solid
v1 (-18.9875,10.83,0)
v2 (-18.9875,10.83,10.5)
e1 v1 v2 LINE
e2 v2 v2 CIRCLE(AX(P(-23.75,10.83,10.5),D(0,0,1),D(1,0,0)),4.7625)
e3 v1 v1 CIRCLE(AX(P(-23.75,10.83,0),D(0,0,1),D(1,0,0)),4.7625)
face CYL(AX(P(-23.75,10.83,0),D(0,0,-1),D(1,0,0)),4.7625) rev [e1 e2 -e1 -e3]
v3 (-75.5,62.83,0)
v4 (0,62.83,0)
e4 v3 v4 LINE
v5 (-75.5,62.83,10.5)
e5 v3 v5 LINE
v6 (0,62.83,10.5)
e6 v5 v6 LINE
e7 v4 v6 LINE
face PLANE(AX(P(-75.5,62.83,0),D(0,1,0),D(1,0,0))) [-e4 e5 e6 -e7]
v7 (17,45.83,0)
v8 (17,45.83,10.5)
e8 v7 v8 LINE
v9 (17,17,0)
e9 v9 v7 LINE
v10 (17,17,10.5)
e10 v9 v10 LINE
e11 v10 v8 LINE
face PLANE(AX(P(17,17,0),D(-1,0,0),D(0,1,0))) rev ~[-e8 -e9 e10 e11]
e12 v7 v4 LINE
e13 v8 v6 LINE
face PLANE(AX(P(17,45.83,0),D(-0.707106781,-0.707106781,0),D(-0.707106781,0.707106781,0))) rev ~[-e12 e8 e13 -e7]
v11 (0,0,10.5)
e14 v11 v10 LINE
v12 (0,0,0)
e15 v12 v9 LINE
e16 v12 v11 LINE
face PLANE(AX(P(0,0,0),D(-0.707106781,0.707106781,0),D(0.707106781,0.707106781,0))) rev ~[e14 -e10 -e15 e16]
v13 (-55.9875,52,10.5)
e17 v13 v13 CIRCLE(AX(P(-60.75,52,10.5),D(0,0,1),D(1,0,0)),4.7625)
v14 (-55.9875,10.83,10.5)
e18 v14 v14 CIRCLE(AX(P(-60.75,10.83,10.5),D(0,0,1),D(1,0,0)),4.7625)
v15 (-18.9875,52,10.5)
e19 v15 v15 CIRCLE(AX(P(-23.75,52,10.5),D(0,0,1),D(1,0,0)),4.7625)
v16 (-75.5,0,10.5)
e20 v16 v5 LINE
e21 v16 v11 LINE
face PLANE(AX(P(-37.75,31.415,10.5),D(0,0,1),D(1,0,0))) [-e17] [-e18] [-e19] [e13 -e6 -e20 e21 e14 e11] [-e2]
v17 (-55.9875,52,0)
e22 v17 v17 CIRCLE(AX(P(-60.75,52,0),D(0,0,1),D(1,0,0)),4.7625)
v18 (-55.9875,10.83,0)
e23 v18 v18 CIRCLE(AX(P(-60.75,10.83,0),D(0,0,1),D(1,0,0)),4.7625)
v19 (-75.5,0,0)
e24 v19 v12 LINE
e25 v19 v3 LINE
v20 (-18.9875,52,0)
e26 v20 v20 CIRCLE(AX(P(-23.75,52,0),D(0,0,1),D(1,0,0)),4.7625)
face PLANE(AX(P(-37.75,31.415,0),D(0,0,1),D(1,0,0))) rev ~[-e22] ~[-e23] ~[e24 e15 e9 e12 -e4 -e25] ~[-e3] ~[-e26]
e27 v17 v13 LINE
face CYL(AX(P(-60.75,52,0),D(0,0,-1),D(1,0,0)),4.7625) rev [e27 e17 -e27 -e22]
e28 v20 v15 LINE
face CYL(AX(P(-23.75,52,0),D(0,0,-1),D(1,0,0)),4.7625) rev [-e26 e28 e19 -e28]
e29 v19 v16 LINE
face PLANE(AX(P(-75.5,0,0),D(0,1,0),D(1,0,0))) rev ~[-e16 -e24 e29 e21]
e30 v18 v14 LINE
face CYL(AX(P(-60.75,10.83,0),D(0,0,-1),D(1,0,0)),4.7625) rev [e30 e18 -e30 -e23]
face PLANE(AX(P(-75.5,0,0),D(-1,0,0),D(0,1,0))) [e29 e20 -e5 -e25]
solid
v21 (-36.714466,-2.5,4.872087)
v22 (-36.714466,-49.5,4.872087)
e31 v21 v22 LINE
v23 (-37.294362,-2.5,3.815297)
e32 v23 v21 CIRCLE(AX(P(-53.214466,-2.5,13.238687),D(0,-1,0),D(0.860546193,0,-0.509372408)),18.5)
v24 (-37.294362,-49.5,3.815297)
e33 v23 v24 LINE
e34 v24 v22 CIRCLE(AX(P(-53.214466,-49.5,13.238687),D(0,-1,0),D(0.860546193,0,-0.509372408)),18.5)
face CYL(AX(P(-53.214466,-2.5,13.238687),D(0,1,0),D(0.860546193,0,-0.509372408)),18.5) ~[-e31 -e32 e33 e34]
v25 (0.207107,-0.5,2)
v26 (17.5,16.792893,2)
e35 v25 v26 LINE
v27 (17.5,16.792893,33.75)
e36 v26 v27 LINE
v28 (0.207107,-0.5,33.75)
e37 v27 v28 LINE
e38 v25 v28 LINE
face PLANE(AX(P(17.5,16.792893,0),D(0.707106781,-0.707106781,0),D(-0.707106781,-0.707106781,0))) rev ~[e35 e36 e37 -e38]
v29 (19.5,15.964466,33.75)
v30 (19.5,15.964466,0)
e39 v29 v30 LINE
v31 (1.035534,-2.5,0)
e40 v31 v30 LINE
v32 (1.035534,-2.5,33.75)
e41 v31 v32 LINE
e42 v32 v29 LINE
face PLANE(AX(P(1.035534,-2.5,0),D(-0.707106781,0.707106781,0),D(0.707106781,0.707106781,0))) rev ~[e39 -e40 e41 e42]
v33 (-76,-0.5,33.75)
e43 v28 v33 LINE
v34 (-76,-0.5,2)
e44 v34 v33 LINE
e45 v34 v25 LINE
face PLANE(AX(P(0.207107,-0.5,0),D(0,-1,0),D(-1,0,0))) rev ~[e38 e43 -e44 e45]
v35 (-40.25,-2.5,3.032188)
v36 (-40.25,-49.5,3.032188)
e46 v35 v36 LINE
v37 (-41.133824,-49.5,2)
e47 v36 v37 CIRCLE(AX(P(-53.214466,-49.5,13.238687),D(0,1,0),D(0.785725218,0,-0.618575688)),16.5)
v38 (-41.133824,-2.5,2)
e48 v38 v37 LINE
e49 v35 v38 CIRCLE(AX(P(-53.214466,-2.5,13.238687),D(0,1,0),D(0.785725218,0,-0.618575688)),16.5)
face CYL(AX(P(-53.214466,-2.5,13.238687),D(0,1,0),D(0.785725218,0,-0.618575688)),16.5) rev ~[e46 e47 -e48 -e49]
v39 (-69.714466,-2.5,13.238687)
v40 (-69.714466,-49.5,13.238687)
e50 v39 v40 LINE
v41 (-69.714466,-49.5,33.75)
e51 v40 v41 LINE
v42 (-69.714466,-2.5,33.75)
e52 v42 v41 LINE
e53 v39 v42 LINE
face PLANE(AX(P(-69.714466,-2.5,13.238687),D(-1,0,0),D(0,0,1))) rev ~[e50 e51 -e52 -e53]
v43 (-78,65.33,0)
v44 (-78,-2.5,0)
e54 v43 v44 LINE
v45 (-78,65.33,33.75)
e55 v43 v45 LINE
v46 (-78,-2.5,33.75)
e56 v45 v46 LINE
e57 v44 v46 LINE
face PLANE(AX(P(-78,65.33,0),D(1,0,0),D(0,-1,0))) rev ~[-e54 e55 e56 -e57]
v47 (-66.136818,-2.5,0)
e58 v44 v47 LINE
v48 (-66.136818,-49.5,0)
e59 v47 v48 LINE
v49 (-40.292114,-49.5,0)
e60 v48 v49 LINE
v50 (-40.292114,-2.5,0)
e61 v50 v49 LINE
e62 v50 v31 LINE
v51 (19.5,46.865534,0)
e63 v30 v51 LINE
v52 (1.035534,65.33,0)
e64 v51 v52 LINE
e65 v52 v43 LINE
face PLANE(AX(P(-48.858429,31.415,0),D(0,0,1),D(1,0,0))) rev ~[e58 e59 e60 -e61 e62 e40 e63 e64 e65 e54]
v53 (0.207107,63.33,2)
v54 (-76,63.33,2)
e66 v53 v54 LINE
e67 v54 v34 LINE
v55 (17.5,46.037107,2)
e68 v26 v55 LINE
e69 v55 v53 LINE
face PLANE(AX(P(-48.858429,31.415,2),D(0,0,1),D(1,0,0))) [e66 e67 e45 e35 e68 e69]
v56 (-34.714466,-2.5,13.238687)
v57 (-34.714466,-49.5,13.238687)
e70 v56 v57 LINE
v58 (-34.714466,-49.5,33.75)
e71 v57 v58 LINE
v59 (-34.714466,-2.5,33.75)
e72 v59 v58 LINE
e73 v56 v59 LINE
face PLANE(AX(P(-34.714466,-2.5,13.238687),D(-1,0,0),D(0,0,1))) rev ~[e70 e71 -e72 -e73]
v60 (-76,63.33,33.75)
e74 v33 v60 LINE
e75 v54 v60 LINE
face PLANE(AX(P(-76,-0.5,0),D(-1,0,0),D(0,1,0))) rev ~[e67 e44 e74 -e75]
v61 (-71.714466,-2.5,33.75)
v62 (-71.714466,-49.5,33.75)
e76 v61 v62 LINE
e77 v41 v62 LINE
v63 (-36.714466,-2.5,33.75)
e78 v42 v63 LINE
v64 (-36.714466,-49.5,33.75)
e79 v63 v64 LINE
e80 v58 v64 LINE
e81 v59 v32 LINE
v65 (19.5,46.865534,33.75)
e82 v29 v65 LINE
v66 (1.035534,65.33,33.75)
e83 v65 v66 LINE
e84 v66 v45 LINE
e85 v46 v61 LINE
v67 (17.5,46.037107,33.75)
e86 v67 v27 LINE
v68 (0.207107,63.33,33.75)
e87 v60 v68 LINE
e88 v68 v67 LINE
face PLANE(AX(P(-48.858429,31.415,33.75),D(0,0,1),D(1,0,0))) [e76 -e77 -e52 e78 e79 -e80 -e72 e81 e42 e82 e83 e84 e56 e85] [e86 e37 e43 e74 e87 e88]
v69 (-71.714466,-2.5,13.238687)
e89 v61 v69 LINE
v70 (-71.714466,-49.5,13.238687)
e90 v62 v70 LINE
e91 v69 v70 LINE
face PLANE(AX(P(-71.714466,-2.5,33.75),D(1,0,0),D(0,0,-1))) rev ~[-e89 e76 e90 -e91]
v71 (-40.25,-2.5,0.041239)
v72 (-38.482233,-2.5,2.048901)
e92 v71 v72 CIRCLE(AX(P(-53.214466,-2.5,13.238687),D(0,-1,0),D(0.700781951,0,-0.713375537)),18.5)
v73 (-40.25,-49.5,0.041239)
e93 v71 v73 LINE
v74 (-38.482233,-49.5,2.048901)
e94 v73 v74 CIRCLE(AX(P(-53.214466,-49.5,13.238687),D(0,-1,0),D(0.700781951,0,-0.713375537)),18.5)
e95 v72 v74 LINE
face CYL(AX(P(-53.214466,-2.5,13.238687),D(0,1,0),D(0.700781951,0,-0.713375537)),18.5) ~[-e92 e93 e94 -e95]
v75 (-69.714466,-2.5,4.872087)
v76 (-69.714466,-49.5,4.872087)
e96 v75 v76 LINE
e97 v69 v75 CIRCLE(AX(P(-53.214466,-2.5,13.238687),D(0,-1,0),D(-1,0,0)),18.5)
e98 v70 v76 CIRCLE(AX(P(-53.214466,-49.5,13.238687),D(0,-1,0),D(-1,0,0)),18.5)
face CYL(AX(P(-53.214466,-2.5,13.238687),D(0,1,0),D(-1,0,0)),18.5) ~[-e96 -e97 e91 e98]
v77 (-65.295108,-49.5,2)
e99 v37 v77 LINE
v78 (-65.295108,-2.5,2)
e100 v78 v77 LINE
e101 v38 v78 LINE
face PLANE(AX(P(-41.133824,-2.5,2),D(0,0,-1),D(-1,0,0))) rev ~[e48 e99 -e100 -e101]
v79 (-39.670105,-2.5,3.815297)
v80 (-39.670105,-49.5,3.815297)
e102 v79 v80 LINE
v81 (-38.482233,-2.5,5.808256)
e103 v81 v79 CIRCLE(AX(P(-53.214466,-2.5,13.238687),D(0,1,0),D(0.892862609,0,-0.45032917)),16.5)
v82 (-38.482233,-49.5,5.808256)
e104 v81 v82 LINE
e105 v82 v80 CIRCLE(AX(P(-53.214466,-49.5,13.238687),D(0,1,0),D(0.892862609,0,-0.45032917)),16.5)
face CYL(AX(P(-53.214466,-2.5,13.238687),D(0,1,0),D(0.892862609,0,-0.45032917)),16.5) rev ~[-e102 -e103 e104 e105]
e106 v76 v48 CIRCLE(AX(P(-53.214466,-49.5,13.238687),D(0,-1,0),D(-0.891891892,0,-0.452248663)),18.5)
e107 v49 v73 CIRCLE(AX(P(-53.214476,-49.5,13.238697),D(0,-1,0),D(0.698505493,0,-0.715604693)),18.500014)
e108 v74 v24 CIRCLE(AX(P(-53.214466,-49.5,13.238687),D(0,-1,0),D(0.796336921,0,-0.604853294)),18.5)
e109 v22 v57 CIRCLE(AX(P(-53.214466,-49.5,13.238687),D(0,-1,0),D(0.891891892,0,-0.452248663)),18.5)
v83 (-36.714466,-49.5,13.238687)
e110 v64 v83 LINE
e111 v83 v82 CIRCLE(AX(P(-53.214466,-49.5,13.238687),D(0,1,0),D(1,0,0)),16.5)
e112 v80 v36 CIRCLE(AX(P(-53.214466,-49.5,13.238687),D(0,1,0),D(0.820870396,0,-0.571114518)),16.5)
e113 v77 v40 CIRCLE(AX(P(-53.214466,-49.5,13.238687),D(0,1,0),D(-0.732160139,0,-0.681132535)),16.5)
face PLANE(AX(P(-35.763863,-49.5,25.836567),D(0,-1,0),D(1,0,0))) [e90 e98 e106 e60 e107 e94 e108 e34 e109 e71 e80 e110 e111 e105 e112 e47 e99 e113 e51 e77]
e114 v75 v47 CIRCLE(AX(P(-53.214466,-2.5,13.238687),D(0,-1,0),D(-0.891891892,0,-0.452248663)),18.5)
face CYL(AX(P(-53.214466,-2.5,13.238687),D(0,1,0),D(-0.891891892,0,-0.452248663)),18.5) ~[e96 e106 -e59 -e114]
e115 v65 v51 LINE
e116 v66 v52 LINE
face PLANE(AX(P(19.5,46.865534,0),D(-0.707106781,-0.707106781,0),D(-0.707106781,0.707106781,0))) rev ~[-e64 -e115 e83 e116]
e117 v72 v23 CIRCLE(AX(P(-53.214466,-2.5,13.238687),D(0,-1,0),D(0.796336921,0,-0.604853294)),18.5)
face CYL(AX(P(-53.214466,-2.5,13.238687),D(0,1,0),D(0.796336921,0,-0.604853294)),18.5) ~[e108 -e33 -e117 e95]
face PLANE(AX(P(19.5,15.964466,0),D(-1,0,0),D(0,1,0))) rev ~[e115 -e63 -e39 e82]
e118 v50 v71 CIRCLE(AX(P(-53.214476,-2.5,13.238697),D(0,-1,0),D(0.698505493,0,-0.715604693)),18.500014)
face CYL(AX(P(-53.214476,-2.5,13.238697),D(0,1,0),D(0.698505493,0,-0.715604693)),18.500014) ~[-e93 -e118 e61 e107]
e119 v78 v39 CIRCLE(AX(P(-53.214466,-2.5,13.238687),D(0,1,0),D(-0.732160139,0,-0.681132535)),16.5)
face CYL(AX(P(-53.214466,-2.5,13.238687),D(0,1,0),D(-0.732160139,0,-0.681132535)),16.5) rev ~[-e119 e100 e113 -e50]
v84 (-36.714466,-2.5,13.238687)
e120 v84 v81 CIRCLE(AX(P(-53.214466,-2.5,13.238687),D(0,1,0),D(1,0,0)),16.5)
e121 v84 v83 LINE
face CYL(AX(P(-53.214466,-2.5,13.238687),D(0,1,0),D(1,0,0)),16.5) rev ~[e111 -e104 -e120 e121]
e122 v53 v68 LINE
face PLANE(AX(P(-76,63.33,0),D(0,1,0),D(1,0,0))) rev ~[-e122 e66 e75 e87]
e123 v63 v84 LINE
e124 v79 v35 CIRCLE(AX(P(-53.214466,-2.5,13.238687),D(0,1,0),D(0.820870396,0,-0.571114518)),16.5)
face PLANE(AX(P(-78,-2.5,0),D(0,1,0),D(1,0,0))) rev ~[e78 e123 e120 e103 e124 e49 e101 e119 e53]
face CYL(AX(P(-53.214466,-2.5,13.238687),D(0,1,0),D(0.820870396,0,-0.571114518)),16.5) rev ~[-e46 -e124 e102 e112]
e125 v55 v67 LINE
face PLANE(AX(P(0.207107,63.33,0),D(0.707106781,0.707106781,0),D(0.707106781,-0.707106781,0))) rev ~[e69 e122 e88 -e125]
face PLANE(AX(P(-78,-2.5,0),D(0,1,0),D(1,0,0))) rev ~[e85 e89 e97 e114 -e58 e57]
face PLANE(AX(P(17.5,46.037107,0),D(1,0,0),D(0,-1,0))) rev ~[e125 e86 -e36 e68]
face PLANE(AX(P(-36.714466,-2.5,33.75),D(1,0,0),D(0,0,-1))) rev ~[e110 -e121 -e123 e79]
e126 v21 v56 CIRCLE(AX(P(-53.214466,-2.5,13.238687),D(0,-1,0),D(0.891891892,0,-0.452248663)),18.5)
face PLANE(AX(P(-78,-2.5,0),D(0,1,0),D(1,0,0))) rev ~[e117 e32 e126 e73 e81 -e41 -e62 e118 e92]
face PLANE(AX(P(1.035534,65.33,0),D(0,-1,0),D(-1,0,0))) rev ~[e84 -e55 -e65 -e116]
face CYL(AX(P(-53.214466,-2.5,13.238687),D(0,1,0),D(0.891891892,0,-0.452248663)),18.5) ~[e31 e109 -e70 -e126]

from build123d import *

# Parameters (mm, degrees)
F0_W     = 75.5
F0_H     = 62.83
F0_R     = 4.7625
F1_DEPTH = 10.5
F2_W     = 76.2071067812
F2_H     = 63.83
F3_DEPTH = 2
F4_DEPTH = 33.75
F9_DEPTH = 47


# Not quite as in the source:
# - a feature of the source that left no trace in its solid (it failed there, or was rolled back) is left out


with BuildPart() as f1:
    # F0 (on Top) → F1 (new body)
    with BuildSketch(Plane.XY):
        with Locations((-37.75, 31.415)):
            Rectangle(F0_W, F0_H)
        with Locations((-60.75, 10.83)):
            Circle(F0_R, mode=Mode.SUBTRACT)
        with Locations((-23.75, 10.83)):
            Circle(F0_R, mode=Mode.SUBTRACT)
        with Locations((-60.75, 52)):
            Circle(F0_R, mode=Mode.SUBTRACT)
        with Locations((-23.75, 52)):
            Circle(F0_R, mode=Mode.SUBTRACT)
        Polygon((0, 62.83), (0, 0), (17, 17), (17, 45.83), align=None)
    extrude(amount=F1_DEPTH)


with BuildPart() as f3:
    # F2 (on Top) → F3 (new body)
    with BuildSketch(Plane.XY):
        Polygon((1.0355339059, 0.3284271247), (0.2071067812, -0.5), (-76, -0.5), (-76, 63.33), (0.2071067812, 63.33), (1.0355339059, 62.5015728753), (1.0355339059, 65.33), (-78, 65.33), (-78, -2.5), (1.0355339059, -2.5), align=None)
        Polygon((17.5, 16.7928932188), (1.0355339059, 0.3284271247), (1.0355339059, -2.5), (19.5, 15.9644660941), (19.5, 46.8655339059), (1.0355339059, 65.33), (1.0355339059, 62.5015728753), (17.5, 46.0371067812), align=None)
        Polygon((1.0355339059, 62.5015728753), (1.0355339059, 0.3284271247), (17.5, 16.7928932188), (17.5, 46.0371067812), align=None)
        with Locations((-37.8964466094, 31.415)):
            Rectangle(F2_W, F2_H)
        Polygon((0.2071067812, 63.33), (0.2071067812, -0.5), (1.0355339059, 0.3284271247), (1.0355339059, 62.5015728753), align=None)
    extrude(amount=F3_DEPTH)

    # F2 (on Top) → F4 (join)
    with BuildSketch(Plane.XY):
        Polygon((1.0355339059, 0.3284271247), (0.2071067812, -0.5), (-76, -0.5), (-76, 63.33), (0.2071067812, 63.33), (1.0355339059, 62.5015728753), (1.0355339059, 65.33), (-78, 65.33), (-78, -2.5), (1.0355339059, -2.5), align=None)
        Polygon((17.5, 16.7928932188), (1.0355339059, 0.3284271247), (1.0355339059, -2.5), (19.5, 15.9644660941), (19.5, 46.8655339059), (1.0355339059, 65.33), (1.0355339059, 62.5015728753), (17.5, 46.0371067812), align=None)
    extrude(amount=F4_DEPTH)

    # F5: union 

    # F6 (on face) → F9 (join)
    with BuildSketch(Plane.XZ.offset(2.5)):
        with BuildLine():
            Line((-34.7144660941, 25.5687510354), (-34.7144660941, 28.1393741738))
            ThreePointArc((-34.7144660941, 28.1393741738), (-35.7447365731, 27.3232988085), (-36.7144660941, 26.4361342702))
            Line((-36.7144660941, 26.4361342702), (-36.7144660941, 23.4451856875))
            ThreePointArc((-36.7144660941, 23.4451856875), (-35.761487475, 24.5512536772), (-34.7144660941, 25.5687510354))
        make_face()
        with BuildLine():
            ThreePointArc((-36.7144660941, 26.4361342702), (-35.7447365731, 27.3232988085), (-34.7144660941, 28.1393741738))
            Line((-34.7144660941, 28.1393741738), (-34.7144660941, 33.75))
            Line((-34.7144660941, 33.75), (-36.7144660941, 33.75))
            Line((-36.7144660941, 33.75), (-36.7144660941, 26.4361342702))
        make_face()
        with BuildLine():
            Line((-34.7144660941, 13.2386868315), (-34.7144660941, 25.5687510354))
            ThreePointArc((-34.7144660941, 25.5687510354), (-35.761487475, 24.5512536772), (-36.7144660941, 23.4451856875))
            Line((-36.7144660941, 23.4451856875), (-36.7144660941, 21.6052870969))
            ThreePointArc((-36.7144660941, 21.6052870969), (-35.2214118786, 17.5398494651), (-34.7144660941, 13.2386868315))
        make_face()
        with BuildLine():
            ThreePointArc((-36.7144660941, 4.8720865662), (-35.2214118786, 8.937524198), (-34.7144660941, 13.2386868315))
            Line((-34.7144660941, 13.2386868315), (-36.7144660941, 13.2386868315))
            Line((-36.7144660941, 13.2386868315), (-36.7144660941, 4.8720865662))
        make_face()
        with BuildLine():
            Line((-36.7144660941, 13.2386868315), (-34.7144660941, 13.2386868315))
            ThreePointArc((-34.7144660941, 13.2386868315), (-35.2214118786, 17.5398494651), (-36.7144660941, 21.6052870969))
            Line((-36.7144660941, 21.6052870969), (-36.7144660941, 13.2386868315))
        make_face()
        with BuildLine():
            Line((-36.7144660941, 4.8720865662), (-36.7144660941, 13.2386868315))
            ThreePointArc((-36.7144660941, 13.2386868315), (-37.1624904325, 9.4197763374), (-38.482233047, 5.8082555219))
            ThreePointArc((-38.482233047, 5.8082555219), (-37.9233701313, 4.7908717814), (-37.2943615313, 3.8152972763))
            ThreePointArc((-37.2943615313, 3.8152972763), (-36.9958041312, 4.3389675026), (-36.7144660941, 4.8720865662))
        make_face()
        with BuildLine():
            ThreePointArc((-37.2943615313, 3.8152972763), (-37.9233701313, 4.7908717814), (-38.482233047, 5.8082555219))
            ThreePointArc((-38.482233047, 5.8082555219), (-39.0410959628, 4.7908717814), (-39.6701045628, 3.8152972763))
            ThreePointArc((-39.6701045628, 3.8152972763), (-39.1015956593, 2.9149999555), (-38.482233047, 2.0489008887))
            ThreePointArc((-38.482233047, 2.0489008887), (-37.8628704348, 2.9149999555), (-37.2943615313, 3.8152972763))
        make_face()
        with BuildLine():
            ThreePointArc((-40.25, 0.0412393929), (-39.3297816541, 1.0130769081), (-38.482233047, 2.0489008887))
            ThreePointArc((-38.482233047, 2.0489008887), (-39.1015956593, 2.9149999555), (-39.6701045628, 3.8152972763))
            ThreePointArc((-39.6701045628, 3.8152972763), (-39.9542699959, 3.4194608214), (-40.25, 3.0321879756))
            Line((-40.25, 3.0321879756), (-40.25, 0.0412393929))
        make_face()
        with BuildLine():
            ThreePointArc((-40.2921144901, 0), (-40.2710408208, 0.0206029237), (-40.25, 0.0412393929))
            Line((-40.25, 0.0412393929), (-40.25, 3.0321879756))
            ThreePointArc((-40.25, 3.0321879756), (-40.6812814796, 2.5069915592), (-41.1338237973, 2))
            ThreePointArc((-41.1338237973, 2), (-41.6789976888, 1.4411036608), (-42.25, 0.9086226277))
            Line((-42.25, 0.9086226277), (-42.25, 0))
            Line((-42.25, 0), (-40.2921144901, 0))
        make_face()
        with BuildLine():
            Line((-41.1338237973, 2), (-42.25, 2))
            Line((-42.25, 2), (-42.25, 0.9086226277))
            ThreePointArc((-42.25, 0.9086226277), (-41.6789976888, 1.4411036608), (-41.1338237973, 2))
        make_face()
        with BuildLine():
            Line((-42.25, 0.9086226277), (-42.25, 2))
            Line((-42.25, 2), (-65.2951083908, 2))
            ThreePointArc((-65.2951083908, 2), (-64.2243980751, 0.9492036132), (-63.0626725793, 0))
            Line((-63.0626725793, 0), (-60.75, 0))
            Line((-60.75, 0), (-43.3662596088, 0))
            ThreePointArc((-43.3662596088, 0), (-42.7982175494, 0.4421339263), (-42.25, 0.9086226277))
        make_face()
        with BuildLine():
            Line((-71.7144660941, 13.2386868315), (-69.7144660941, 13.2386868315))
            Line((-69.7144660941, 13.2386868544), (-69.7144660941, 21.6052870969))
            ThreePointArc((-69.7144660941, 21.6052870969), (-71.2075203095, 17.5398494651), (-71.7144660941, 13.2386868315))
        make_face()
        with BuildLine():
            ThreePointArc((-65.2951083908, 2), (-68.5699308893, 7.2004999412), (-69.7144660941, 13.2386868544))
            Line((-69.7144660941, 13.2386868544), (-69.7144660941, 4.8720865662))
            ThreePointArc((-69.7144660941, 4.8720865662), (-68.1259717308, 2.2889379921), (-66.136817698, 0))
            Line((-66.136817698, 0), (-63.0626725793, 0))
            ThreePointArc((-63.0626725793, 0), (-64.2243980751, 0.9492036132), (-65.2951083908, 2))
        make_face()
        with BuildLine():
            Line((-69.7144660941, 4.8720865662), (-69.7144660941, 13.2386868544))
            Line((-69.7144660941, 13.2386868315), (-71.7144660941, 13.2386868315))
            ThreePointArc((-71.7144660941, 13.2386868315), (-71.2075203095, 8.937524198), (-69.7144660941, 4.8720865662))
        make_face()
        with BuildLine():
            ThreePointArc((-71.7144660941, 13.2386868315), (-71.2075203095, 17.5398494651), (-69.7144660941, 21.6052870969))
            Line((-69.7144660941, 21.6052870969), (-69.7144660941, 33.75))
            Line((-69.7144660941, 33.75), (-71.7144660941, 33.75))
            Line((-71.7144660941, 33.75), (-71.7144660941, 13.2386868315))
        make_face()
        with BuildLine():
            Line((-43.3662596088, 0), (-42.25, 0))
            Line((-42.25, 0), (-42.25, 0.9086226277))
            ThreePointArc((-42.25, 0.9086226277), (-42.7982175494, 0.4421339263), (-43.3662596088, 0))
        make_face()
    extrude(amount=F9_DEPTH)


solid = Compound([f1.part, f3.part])
